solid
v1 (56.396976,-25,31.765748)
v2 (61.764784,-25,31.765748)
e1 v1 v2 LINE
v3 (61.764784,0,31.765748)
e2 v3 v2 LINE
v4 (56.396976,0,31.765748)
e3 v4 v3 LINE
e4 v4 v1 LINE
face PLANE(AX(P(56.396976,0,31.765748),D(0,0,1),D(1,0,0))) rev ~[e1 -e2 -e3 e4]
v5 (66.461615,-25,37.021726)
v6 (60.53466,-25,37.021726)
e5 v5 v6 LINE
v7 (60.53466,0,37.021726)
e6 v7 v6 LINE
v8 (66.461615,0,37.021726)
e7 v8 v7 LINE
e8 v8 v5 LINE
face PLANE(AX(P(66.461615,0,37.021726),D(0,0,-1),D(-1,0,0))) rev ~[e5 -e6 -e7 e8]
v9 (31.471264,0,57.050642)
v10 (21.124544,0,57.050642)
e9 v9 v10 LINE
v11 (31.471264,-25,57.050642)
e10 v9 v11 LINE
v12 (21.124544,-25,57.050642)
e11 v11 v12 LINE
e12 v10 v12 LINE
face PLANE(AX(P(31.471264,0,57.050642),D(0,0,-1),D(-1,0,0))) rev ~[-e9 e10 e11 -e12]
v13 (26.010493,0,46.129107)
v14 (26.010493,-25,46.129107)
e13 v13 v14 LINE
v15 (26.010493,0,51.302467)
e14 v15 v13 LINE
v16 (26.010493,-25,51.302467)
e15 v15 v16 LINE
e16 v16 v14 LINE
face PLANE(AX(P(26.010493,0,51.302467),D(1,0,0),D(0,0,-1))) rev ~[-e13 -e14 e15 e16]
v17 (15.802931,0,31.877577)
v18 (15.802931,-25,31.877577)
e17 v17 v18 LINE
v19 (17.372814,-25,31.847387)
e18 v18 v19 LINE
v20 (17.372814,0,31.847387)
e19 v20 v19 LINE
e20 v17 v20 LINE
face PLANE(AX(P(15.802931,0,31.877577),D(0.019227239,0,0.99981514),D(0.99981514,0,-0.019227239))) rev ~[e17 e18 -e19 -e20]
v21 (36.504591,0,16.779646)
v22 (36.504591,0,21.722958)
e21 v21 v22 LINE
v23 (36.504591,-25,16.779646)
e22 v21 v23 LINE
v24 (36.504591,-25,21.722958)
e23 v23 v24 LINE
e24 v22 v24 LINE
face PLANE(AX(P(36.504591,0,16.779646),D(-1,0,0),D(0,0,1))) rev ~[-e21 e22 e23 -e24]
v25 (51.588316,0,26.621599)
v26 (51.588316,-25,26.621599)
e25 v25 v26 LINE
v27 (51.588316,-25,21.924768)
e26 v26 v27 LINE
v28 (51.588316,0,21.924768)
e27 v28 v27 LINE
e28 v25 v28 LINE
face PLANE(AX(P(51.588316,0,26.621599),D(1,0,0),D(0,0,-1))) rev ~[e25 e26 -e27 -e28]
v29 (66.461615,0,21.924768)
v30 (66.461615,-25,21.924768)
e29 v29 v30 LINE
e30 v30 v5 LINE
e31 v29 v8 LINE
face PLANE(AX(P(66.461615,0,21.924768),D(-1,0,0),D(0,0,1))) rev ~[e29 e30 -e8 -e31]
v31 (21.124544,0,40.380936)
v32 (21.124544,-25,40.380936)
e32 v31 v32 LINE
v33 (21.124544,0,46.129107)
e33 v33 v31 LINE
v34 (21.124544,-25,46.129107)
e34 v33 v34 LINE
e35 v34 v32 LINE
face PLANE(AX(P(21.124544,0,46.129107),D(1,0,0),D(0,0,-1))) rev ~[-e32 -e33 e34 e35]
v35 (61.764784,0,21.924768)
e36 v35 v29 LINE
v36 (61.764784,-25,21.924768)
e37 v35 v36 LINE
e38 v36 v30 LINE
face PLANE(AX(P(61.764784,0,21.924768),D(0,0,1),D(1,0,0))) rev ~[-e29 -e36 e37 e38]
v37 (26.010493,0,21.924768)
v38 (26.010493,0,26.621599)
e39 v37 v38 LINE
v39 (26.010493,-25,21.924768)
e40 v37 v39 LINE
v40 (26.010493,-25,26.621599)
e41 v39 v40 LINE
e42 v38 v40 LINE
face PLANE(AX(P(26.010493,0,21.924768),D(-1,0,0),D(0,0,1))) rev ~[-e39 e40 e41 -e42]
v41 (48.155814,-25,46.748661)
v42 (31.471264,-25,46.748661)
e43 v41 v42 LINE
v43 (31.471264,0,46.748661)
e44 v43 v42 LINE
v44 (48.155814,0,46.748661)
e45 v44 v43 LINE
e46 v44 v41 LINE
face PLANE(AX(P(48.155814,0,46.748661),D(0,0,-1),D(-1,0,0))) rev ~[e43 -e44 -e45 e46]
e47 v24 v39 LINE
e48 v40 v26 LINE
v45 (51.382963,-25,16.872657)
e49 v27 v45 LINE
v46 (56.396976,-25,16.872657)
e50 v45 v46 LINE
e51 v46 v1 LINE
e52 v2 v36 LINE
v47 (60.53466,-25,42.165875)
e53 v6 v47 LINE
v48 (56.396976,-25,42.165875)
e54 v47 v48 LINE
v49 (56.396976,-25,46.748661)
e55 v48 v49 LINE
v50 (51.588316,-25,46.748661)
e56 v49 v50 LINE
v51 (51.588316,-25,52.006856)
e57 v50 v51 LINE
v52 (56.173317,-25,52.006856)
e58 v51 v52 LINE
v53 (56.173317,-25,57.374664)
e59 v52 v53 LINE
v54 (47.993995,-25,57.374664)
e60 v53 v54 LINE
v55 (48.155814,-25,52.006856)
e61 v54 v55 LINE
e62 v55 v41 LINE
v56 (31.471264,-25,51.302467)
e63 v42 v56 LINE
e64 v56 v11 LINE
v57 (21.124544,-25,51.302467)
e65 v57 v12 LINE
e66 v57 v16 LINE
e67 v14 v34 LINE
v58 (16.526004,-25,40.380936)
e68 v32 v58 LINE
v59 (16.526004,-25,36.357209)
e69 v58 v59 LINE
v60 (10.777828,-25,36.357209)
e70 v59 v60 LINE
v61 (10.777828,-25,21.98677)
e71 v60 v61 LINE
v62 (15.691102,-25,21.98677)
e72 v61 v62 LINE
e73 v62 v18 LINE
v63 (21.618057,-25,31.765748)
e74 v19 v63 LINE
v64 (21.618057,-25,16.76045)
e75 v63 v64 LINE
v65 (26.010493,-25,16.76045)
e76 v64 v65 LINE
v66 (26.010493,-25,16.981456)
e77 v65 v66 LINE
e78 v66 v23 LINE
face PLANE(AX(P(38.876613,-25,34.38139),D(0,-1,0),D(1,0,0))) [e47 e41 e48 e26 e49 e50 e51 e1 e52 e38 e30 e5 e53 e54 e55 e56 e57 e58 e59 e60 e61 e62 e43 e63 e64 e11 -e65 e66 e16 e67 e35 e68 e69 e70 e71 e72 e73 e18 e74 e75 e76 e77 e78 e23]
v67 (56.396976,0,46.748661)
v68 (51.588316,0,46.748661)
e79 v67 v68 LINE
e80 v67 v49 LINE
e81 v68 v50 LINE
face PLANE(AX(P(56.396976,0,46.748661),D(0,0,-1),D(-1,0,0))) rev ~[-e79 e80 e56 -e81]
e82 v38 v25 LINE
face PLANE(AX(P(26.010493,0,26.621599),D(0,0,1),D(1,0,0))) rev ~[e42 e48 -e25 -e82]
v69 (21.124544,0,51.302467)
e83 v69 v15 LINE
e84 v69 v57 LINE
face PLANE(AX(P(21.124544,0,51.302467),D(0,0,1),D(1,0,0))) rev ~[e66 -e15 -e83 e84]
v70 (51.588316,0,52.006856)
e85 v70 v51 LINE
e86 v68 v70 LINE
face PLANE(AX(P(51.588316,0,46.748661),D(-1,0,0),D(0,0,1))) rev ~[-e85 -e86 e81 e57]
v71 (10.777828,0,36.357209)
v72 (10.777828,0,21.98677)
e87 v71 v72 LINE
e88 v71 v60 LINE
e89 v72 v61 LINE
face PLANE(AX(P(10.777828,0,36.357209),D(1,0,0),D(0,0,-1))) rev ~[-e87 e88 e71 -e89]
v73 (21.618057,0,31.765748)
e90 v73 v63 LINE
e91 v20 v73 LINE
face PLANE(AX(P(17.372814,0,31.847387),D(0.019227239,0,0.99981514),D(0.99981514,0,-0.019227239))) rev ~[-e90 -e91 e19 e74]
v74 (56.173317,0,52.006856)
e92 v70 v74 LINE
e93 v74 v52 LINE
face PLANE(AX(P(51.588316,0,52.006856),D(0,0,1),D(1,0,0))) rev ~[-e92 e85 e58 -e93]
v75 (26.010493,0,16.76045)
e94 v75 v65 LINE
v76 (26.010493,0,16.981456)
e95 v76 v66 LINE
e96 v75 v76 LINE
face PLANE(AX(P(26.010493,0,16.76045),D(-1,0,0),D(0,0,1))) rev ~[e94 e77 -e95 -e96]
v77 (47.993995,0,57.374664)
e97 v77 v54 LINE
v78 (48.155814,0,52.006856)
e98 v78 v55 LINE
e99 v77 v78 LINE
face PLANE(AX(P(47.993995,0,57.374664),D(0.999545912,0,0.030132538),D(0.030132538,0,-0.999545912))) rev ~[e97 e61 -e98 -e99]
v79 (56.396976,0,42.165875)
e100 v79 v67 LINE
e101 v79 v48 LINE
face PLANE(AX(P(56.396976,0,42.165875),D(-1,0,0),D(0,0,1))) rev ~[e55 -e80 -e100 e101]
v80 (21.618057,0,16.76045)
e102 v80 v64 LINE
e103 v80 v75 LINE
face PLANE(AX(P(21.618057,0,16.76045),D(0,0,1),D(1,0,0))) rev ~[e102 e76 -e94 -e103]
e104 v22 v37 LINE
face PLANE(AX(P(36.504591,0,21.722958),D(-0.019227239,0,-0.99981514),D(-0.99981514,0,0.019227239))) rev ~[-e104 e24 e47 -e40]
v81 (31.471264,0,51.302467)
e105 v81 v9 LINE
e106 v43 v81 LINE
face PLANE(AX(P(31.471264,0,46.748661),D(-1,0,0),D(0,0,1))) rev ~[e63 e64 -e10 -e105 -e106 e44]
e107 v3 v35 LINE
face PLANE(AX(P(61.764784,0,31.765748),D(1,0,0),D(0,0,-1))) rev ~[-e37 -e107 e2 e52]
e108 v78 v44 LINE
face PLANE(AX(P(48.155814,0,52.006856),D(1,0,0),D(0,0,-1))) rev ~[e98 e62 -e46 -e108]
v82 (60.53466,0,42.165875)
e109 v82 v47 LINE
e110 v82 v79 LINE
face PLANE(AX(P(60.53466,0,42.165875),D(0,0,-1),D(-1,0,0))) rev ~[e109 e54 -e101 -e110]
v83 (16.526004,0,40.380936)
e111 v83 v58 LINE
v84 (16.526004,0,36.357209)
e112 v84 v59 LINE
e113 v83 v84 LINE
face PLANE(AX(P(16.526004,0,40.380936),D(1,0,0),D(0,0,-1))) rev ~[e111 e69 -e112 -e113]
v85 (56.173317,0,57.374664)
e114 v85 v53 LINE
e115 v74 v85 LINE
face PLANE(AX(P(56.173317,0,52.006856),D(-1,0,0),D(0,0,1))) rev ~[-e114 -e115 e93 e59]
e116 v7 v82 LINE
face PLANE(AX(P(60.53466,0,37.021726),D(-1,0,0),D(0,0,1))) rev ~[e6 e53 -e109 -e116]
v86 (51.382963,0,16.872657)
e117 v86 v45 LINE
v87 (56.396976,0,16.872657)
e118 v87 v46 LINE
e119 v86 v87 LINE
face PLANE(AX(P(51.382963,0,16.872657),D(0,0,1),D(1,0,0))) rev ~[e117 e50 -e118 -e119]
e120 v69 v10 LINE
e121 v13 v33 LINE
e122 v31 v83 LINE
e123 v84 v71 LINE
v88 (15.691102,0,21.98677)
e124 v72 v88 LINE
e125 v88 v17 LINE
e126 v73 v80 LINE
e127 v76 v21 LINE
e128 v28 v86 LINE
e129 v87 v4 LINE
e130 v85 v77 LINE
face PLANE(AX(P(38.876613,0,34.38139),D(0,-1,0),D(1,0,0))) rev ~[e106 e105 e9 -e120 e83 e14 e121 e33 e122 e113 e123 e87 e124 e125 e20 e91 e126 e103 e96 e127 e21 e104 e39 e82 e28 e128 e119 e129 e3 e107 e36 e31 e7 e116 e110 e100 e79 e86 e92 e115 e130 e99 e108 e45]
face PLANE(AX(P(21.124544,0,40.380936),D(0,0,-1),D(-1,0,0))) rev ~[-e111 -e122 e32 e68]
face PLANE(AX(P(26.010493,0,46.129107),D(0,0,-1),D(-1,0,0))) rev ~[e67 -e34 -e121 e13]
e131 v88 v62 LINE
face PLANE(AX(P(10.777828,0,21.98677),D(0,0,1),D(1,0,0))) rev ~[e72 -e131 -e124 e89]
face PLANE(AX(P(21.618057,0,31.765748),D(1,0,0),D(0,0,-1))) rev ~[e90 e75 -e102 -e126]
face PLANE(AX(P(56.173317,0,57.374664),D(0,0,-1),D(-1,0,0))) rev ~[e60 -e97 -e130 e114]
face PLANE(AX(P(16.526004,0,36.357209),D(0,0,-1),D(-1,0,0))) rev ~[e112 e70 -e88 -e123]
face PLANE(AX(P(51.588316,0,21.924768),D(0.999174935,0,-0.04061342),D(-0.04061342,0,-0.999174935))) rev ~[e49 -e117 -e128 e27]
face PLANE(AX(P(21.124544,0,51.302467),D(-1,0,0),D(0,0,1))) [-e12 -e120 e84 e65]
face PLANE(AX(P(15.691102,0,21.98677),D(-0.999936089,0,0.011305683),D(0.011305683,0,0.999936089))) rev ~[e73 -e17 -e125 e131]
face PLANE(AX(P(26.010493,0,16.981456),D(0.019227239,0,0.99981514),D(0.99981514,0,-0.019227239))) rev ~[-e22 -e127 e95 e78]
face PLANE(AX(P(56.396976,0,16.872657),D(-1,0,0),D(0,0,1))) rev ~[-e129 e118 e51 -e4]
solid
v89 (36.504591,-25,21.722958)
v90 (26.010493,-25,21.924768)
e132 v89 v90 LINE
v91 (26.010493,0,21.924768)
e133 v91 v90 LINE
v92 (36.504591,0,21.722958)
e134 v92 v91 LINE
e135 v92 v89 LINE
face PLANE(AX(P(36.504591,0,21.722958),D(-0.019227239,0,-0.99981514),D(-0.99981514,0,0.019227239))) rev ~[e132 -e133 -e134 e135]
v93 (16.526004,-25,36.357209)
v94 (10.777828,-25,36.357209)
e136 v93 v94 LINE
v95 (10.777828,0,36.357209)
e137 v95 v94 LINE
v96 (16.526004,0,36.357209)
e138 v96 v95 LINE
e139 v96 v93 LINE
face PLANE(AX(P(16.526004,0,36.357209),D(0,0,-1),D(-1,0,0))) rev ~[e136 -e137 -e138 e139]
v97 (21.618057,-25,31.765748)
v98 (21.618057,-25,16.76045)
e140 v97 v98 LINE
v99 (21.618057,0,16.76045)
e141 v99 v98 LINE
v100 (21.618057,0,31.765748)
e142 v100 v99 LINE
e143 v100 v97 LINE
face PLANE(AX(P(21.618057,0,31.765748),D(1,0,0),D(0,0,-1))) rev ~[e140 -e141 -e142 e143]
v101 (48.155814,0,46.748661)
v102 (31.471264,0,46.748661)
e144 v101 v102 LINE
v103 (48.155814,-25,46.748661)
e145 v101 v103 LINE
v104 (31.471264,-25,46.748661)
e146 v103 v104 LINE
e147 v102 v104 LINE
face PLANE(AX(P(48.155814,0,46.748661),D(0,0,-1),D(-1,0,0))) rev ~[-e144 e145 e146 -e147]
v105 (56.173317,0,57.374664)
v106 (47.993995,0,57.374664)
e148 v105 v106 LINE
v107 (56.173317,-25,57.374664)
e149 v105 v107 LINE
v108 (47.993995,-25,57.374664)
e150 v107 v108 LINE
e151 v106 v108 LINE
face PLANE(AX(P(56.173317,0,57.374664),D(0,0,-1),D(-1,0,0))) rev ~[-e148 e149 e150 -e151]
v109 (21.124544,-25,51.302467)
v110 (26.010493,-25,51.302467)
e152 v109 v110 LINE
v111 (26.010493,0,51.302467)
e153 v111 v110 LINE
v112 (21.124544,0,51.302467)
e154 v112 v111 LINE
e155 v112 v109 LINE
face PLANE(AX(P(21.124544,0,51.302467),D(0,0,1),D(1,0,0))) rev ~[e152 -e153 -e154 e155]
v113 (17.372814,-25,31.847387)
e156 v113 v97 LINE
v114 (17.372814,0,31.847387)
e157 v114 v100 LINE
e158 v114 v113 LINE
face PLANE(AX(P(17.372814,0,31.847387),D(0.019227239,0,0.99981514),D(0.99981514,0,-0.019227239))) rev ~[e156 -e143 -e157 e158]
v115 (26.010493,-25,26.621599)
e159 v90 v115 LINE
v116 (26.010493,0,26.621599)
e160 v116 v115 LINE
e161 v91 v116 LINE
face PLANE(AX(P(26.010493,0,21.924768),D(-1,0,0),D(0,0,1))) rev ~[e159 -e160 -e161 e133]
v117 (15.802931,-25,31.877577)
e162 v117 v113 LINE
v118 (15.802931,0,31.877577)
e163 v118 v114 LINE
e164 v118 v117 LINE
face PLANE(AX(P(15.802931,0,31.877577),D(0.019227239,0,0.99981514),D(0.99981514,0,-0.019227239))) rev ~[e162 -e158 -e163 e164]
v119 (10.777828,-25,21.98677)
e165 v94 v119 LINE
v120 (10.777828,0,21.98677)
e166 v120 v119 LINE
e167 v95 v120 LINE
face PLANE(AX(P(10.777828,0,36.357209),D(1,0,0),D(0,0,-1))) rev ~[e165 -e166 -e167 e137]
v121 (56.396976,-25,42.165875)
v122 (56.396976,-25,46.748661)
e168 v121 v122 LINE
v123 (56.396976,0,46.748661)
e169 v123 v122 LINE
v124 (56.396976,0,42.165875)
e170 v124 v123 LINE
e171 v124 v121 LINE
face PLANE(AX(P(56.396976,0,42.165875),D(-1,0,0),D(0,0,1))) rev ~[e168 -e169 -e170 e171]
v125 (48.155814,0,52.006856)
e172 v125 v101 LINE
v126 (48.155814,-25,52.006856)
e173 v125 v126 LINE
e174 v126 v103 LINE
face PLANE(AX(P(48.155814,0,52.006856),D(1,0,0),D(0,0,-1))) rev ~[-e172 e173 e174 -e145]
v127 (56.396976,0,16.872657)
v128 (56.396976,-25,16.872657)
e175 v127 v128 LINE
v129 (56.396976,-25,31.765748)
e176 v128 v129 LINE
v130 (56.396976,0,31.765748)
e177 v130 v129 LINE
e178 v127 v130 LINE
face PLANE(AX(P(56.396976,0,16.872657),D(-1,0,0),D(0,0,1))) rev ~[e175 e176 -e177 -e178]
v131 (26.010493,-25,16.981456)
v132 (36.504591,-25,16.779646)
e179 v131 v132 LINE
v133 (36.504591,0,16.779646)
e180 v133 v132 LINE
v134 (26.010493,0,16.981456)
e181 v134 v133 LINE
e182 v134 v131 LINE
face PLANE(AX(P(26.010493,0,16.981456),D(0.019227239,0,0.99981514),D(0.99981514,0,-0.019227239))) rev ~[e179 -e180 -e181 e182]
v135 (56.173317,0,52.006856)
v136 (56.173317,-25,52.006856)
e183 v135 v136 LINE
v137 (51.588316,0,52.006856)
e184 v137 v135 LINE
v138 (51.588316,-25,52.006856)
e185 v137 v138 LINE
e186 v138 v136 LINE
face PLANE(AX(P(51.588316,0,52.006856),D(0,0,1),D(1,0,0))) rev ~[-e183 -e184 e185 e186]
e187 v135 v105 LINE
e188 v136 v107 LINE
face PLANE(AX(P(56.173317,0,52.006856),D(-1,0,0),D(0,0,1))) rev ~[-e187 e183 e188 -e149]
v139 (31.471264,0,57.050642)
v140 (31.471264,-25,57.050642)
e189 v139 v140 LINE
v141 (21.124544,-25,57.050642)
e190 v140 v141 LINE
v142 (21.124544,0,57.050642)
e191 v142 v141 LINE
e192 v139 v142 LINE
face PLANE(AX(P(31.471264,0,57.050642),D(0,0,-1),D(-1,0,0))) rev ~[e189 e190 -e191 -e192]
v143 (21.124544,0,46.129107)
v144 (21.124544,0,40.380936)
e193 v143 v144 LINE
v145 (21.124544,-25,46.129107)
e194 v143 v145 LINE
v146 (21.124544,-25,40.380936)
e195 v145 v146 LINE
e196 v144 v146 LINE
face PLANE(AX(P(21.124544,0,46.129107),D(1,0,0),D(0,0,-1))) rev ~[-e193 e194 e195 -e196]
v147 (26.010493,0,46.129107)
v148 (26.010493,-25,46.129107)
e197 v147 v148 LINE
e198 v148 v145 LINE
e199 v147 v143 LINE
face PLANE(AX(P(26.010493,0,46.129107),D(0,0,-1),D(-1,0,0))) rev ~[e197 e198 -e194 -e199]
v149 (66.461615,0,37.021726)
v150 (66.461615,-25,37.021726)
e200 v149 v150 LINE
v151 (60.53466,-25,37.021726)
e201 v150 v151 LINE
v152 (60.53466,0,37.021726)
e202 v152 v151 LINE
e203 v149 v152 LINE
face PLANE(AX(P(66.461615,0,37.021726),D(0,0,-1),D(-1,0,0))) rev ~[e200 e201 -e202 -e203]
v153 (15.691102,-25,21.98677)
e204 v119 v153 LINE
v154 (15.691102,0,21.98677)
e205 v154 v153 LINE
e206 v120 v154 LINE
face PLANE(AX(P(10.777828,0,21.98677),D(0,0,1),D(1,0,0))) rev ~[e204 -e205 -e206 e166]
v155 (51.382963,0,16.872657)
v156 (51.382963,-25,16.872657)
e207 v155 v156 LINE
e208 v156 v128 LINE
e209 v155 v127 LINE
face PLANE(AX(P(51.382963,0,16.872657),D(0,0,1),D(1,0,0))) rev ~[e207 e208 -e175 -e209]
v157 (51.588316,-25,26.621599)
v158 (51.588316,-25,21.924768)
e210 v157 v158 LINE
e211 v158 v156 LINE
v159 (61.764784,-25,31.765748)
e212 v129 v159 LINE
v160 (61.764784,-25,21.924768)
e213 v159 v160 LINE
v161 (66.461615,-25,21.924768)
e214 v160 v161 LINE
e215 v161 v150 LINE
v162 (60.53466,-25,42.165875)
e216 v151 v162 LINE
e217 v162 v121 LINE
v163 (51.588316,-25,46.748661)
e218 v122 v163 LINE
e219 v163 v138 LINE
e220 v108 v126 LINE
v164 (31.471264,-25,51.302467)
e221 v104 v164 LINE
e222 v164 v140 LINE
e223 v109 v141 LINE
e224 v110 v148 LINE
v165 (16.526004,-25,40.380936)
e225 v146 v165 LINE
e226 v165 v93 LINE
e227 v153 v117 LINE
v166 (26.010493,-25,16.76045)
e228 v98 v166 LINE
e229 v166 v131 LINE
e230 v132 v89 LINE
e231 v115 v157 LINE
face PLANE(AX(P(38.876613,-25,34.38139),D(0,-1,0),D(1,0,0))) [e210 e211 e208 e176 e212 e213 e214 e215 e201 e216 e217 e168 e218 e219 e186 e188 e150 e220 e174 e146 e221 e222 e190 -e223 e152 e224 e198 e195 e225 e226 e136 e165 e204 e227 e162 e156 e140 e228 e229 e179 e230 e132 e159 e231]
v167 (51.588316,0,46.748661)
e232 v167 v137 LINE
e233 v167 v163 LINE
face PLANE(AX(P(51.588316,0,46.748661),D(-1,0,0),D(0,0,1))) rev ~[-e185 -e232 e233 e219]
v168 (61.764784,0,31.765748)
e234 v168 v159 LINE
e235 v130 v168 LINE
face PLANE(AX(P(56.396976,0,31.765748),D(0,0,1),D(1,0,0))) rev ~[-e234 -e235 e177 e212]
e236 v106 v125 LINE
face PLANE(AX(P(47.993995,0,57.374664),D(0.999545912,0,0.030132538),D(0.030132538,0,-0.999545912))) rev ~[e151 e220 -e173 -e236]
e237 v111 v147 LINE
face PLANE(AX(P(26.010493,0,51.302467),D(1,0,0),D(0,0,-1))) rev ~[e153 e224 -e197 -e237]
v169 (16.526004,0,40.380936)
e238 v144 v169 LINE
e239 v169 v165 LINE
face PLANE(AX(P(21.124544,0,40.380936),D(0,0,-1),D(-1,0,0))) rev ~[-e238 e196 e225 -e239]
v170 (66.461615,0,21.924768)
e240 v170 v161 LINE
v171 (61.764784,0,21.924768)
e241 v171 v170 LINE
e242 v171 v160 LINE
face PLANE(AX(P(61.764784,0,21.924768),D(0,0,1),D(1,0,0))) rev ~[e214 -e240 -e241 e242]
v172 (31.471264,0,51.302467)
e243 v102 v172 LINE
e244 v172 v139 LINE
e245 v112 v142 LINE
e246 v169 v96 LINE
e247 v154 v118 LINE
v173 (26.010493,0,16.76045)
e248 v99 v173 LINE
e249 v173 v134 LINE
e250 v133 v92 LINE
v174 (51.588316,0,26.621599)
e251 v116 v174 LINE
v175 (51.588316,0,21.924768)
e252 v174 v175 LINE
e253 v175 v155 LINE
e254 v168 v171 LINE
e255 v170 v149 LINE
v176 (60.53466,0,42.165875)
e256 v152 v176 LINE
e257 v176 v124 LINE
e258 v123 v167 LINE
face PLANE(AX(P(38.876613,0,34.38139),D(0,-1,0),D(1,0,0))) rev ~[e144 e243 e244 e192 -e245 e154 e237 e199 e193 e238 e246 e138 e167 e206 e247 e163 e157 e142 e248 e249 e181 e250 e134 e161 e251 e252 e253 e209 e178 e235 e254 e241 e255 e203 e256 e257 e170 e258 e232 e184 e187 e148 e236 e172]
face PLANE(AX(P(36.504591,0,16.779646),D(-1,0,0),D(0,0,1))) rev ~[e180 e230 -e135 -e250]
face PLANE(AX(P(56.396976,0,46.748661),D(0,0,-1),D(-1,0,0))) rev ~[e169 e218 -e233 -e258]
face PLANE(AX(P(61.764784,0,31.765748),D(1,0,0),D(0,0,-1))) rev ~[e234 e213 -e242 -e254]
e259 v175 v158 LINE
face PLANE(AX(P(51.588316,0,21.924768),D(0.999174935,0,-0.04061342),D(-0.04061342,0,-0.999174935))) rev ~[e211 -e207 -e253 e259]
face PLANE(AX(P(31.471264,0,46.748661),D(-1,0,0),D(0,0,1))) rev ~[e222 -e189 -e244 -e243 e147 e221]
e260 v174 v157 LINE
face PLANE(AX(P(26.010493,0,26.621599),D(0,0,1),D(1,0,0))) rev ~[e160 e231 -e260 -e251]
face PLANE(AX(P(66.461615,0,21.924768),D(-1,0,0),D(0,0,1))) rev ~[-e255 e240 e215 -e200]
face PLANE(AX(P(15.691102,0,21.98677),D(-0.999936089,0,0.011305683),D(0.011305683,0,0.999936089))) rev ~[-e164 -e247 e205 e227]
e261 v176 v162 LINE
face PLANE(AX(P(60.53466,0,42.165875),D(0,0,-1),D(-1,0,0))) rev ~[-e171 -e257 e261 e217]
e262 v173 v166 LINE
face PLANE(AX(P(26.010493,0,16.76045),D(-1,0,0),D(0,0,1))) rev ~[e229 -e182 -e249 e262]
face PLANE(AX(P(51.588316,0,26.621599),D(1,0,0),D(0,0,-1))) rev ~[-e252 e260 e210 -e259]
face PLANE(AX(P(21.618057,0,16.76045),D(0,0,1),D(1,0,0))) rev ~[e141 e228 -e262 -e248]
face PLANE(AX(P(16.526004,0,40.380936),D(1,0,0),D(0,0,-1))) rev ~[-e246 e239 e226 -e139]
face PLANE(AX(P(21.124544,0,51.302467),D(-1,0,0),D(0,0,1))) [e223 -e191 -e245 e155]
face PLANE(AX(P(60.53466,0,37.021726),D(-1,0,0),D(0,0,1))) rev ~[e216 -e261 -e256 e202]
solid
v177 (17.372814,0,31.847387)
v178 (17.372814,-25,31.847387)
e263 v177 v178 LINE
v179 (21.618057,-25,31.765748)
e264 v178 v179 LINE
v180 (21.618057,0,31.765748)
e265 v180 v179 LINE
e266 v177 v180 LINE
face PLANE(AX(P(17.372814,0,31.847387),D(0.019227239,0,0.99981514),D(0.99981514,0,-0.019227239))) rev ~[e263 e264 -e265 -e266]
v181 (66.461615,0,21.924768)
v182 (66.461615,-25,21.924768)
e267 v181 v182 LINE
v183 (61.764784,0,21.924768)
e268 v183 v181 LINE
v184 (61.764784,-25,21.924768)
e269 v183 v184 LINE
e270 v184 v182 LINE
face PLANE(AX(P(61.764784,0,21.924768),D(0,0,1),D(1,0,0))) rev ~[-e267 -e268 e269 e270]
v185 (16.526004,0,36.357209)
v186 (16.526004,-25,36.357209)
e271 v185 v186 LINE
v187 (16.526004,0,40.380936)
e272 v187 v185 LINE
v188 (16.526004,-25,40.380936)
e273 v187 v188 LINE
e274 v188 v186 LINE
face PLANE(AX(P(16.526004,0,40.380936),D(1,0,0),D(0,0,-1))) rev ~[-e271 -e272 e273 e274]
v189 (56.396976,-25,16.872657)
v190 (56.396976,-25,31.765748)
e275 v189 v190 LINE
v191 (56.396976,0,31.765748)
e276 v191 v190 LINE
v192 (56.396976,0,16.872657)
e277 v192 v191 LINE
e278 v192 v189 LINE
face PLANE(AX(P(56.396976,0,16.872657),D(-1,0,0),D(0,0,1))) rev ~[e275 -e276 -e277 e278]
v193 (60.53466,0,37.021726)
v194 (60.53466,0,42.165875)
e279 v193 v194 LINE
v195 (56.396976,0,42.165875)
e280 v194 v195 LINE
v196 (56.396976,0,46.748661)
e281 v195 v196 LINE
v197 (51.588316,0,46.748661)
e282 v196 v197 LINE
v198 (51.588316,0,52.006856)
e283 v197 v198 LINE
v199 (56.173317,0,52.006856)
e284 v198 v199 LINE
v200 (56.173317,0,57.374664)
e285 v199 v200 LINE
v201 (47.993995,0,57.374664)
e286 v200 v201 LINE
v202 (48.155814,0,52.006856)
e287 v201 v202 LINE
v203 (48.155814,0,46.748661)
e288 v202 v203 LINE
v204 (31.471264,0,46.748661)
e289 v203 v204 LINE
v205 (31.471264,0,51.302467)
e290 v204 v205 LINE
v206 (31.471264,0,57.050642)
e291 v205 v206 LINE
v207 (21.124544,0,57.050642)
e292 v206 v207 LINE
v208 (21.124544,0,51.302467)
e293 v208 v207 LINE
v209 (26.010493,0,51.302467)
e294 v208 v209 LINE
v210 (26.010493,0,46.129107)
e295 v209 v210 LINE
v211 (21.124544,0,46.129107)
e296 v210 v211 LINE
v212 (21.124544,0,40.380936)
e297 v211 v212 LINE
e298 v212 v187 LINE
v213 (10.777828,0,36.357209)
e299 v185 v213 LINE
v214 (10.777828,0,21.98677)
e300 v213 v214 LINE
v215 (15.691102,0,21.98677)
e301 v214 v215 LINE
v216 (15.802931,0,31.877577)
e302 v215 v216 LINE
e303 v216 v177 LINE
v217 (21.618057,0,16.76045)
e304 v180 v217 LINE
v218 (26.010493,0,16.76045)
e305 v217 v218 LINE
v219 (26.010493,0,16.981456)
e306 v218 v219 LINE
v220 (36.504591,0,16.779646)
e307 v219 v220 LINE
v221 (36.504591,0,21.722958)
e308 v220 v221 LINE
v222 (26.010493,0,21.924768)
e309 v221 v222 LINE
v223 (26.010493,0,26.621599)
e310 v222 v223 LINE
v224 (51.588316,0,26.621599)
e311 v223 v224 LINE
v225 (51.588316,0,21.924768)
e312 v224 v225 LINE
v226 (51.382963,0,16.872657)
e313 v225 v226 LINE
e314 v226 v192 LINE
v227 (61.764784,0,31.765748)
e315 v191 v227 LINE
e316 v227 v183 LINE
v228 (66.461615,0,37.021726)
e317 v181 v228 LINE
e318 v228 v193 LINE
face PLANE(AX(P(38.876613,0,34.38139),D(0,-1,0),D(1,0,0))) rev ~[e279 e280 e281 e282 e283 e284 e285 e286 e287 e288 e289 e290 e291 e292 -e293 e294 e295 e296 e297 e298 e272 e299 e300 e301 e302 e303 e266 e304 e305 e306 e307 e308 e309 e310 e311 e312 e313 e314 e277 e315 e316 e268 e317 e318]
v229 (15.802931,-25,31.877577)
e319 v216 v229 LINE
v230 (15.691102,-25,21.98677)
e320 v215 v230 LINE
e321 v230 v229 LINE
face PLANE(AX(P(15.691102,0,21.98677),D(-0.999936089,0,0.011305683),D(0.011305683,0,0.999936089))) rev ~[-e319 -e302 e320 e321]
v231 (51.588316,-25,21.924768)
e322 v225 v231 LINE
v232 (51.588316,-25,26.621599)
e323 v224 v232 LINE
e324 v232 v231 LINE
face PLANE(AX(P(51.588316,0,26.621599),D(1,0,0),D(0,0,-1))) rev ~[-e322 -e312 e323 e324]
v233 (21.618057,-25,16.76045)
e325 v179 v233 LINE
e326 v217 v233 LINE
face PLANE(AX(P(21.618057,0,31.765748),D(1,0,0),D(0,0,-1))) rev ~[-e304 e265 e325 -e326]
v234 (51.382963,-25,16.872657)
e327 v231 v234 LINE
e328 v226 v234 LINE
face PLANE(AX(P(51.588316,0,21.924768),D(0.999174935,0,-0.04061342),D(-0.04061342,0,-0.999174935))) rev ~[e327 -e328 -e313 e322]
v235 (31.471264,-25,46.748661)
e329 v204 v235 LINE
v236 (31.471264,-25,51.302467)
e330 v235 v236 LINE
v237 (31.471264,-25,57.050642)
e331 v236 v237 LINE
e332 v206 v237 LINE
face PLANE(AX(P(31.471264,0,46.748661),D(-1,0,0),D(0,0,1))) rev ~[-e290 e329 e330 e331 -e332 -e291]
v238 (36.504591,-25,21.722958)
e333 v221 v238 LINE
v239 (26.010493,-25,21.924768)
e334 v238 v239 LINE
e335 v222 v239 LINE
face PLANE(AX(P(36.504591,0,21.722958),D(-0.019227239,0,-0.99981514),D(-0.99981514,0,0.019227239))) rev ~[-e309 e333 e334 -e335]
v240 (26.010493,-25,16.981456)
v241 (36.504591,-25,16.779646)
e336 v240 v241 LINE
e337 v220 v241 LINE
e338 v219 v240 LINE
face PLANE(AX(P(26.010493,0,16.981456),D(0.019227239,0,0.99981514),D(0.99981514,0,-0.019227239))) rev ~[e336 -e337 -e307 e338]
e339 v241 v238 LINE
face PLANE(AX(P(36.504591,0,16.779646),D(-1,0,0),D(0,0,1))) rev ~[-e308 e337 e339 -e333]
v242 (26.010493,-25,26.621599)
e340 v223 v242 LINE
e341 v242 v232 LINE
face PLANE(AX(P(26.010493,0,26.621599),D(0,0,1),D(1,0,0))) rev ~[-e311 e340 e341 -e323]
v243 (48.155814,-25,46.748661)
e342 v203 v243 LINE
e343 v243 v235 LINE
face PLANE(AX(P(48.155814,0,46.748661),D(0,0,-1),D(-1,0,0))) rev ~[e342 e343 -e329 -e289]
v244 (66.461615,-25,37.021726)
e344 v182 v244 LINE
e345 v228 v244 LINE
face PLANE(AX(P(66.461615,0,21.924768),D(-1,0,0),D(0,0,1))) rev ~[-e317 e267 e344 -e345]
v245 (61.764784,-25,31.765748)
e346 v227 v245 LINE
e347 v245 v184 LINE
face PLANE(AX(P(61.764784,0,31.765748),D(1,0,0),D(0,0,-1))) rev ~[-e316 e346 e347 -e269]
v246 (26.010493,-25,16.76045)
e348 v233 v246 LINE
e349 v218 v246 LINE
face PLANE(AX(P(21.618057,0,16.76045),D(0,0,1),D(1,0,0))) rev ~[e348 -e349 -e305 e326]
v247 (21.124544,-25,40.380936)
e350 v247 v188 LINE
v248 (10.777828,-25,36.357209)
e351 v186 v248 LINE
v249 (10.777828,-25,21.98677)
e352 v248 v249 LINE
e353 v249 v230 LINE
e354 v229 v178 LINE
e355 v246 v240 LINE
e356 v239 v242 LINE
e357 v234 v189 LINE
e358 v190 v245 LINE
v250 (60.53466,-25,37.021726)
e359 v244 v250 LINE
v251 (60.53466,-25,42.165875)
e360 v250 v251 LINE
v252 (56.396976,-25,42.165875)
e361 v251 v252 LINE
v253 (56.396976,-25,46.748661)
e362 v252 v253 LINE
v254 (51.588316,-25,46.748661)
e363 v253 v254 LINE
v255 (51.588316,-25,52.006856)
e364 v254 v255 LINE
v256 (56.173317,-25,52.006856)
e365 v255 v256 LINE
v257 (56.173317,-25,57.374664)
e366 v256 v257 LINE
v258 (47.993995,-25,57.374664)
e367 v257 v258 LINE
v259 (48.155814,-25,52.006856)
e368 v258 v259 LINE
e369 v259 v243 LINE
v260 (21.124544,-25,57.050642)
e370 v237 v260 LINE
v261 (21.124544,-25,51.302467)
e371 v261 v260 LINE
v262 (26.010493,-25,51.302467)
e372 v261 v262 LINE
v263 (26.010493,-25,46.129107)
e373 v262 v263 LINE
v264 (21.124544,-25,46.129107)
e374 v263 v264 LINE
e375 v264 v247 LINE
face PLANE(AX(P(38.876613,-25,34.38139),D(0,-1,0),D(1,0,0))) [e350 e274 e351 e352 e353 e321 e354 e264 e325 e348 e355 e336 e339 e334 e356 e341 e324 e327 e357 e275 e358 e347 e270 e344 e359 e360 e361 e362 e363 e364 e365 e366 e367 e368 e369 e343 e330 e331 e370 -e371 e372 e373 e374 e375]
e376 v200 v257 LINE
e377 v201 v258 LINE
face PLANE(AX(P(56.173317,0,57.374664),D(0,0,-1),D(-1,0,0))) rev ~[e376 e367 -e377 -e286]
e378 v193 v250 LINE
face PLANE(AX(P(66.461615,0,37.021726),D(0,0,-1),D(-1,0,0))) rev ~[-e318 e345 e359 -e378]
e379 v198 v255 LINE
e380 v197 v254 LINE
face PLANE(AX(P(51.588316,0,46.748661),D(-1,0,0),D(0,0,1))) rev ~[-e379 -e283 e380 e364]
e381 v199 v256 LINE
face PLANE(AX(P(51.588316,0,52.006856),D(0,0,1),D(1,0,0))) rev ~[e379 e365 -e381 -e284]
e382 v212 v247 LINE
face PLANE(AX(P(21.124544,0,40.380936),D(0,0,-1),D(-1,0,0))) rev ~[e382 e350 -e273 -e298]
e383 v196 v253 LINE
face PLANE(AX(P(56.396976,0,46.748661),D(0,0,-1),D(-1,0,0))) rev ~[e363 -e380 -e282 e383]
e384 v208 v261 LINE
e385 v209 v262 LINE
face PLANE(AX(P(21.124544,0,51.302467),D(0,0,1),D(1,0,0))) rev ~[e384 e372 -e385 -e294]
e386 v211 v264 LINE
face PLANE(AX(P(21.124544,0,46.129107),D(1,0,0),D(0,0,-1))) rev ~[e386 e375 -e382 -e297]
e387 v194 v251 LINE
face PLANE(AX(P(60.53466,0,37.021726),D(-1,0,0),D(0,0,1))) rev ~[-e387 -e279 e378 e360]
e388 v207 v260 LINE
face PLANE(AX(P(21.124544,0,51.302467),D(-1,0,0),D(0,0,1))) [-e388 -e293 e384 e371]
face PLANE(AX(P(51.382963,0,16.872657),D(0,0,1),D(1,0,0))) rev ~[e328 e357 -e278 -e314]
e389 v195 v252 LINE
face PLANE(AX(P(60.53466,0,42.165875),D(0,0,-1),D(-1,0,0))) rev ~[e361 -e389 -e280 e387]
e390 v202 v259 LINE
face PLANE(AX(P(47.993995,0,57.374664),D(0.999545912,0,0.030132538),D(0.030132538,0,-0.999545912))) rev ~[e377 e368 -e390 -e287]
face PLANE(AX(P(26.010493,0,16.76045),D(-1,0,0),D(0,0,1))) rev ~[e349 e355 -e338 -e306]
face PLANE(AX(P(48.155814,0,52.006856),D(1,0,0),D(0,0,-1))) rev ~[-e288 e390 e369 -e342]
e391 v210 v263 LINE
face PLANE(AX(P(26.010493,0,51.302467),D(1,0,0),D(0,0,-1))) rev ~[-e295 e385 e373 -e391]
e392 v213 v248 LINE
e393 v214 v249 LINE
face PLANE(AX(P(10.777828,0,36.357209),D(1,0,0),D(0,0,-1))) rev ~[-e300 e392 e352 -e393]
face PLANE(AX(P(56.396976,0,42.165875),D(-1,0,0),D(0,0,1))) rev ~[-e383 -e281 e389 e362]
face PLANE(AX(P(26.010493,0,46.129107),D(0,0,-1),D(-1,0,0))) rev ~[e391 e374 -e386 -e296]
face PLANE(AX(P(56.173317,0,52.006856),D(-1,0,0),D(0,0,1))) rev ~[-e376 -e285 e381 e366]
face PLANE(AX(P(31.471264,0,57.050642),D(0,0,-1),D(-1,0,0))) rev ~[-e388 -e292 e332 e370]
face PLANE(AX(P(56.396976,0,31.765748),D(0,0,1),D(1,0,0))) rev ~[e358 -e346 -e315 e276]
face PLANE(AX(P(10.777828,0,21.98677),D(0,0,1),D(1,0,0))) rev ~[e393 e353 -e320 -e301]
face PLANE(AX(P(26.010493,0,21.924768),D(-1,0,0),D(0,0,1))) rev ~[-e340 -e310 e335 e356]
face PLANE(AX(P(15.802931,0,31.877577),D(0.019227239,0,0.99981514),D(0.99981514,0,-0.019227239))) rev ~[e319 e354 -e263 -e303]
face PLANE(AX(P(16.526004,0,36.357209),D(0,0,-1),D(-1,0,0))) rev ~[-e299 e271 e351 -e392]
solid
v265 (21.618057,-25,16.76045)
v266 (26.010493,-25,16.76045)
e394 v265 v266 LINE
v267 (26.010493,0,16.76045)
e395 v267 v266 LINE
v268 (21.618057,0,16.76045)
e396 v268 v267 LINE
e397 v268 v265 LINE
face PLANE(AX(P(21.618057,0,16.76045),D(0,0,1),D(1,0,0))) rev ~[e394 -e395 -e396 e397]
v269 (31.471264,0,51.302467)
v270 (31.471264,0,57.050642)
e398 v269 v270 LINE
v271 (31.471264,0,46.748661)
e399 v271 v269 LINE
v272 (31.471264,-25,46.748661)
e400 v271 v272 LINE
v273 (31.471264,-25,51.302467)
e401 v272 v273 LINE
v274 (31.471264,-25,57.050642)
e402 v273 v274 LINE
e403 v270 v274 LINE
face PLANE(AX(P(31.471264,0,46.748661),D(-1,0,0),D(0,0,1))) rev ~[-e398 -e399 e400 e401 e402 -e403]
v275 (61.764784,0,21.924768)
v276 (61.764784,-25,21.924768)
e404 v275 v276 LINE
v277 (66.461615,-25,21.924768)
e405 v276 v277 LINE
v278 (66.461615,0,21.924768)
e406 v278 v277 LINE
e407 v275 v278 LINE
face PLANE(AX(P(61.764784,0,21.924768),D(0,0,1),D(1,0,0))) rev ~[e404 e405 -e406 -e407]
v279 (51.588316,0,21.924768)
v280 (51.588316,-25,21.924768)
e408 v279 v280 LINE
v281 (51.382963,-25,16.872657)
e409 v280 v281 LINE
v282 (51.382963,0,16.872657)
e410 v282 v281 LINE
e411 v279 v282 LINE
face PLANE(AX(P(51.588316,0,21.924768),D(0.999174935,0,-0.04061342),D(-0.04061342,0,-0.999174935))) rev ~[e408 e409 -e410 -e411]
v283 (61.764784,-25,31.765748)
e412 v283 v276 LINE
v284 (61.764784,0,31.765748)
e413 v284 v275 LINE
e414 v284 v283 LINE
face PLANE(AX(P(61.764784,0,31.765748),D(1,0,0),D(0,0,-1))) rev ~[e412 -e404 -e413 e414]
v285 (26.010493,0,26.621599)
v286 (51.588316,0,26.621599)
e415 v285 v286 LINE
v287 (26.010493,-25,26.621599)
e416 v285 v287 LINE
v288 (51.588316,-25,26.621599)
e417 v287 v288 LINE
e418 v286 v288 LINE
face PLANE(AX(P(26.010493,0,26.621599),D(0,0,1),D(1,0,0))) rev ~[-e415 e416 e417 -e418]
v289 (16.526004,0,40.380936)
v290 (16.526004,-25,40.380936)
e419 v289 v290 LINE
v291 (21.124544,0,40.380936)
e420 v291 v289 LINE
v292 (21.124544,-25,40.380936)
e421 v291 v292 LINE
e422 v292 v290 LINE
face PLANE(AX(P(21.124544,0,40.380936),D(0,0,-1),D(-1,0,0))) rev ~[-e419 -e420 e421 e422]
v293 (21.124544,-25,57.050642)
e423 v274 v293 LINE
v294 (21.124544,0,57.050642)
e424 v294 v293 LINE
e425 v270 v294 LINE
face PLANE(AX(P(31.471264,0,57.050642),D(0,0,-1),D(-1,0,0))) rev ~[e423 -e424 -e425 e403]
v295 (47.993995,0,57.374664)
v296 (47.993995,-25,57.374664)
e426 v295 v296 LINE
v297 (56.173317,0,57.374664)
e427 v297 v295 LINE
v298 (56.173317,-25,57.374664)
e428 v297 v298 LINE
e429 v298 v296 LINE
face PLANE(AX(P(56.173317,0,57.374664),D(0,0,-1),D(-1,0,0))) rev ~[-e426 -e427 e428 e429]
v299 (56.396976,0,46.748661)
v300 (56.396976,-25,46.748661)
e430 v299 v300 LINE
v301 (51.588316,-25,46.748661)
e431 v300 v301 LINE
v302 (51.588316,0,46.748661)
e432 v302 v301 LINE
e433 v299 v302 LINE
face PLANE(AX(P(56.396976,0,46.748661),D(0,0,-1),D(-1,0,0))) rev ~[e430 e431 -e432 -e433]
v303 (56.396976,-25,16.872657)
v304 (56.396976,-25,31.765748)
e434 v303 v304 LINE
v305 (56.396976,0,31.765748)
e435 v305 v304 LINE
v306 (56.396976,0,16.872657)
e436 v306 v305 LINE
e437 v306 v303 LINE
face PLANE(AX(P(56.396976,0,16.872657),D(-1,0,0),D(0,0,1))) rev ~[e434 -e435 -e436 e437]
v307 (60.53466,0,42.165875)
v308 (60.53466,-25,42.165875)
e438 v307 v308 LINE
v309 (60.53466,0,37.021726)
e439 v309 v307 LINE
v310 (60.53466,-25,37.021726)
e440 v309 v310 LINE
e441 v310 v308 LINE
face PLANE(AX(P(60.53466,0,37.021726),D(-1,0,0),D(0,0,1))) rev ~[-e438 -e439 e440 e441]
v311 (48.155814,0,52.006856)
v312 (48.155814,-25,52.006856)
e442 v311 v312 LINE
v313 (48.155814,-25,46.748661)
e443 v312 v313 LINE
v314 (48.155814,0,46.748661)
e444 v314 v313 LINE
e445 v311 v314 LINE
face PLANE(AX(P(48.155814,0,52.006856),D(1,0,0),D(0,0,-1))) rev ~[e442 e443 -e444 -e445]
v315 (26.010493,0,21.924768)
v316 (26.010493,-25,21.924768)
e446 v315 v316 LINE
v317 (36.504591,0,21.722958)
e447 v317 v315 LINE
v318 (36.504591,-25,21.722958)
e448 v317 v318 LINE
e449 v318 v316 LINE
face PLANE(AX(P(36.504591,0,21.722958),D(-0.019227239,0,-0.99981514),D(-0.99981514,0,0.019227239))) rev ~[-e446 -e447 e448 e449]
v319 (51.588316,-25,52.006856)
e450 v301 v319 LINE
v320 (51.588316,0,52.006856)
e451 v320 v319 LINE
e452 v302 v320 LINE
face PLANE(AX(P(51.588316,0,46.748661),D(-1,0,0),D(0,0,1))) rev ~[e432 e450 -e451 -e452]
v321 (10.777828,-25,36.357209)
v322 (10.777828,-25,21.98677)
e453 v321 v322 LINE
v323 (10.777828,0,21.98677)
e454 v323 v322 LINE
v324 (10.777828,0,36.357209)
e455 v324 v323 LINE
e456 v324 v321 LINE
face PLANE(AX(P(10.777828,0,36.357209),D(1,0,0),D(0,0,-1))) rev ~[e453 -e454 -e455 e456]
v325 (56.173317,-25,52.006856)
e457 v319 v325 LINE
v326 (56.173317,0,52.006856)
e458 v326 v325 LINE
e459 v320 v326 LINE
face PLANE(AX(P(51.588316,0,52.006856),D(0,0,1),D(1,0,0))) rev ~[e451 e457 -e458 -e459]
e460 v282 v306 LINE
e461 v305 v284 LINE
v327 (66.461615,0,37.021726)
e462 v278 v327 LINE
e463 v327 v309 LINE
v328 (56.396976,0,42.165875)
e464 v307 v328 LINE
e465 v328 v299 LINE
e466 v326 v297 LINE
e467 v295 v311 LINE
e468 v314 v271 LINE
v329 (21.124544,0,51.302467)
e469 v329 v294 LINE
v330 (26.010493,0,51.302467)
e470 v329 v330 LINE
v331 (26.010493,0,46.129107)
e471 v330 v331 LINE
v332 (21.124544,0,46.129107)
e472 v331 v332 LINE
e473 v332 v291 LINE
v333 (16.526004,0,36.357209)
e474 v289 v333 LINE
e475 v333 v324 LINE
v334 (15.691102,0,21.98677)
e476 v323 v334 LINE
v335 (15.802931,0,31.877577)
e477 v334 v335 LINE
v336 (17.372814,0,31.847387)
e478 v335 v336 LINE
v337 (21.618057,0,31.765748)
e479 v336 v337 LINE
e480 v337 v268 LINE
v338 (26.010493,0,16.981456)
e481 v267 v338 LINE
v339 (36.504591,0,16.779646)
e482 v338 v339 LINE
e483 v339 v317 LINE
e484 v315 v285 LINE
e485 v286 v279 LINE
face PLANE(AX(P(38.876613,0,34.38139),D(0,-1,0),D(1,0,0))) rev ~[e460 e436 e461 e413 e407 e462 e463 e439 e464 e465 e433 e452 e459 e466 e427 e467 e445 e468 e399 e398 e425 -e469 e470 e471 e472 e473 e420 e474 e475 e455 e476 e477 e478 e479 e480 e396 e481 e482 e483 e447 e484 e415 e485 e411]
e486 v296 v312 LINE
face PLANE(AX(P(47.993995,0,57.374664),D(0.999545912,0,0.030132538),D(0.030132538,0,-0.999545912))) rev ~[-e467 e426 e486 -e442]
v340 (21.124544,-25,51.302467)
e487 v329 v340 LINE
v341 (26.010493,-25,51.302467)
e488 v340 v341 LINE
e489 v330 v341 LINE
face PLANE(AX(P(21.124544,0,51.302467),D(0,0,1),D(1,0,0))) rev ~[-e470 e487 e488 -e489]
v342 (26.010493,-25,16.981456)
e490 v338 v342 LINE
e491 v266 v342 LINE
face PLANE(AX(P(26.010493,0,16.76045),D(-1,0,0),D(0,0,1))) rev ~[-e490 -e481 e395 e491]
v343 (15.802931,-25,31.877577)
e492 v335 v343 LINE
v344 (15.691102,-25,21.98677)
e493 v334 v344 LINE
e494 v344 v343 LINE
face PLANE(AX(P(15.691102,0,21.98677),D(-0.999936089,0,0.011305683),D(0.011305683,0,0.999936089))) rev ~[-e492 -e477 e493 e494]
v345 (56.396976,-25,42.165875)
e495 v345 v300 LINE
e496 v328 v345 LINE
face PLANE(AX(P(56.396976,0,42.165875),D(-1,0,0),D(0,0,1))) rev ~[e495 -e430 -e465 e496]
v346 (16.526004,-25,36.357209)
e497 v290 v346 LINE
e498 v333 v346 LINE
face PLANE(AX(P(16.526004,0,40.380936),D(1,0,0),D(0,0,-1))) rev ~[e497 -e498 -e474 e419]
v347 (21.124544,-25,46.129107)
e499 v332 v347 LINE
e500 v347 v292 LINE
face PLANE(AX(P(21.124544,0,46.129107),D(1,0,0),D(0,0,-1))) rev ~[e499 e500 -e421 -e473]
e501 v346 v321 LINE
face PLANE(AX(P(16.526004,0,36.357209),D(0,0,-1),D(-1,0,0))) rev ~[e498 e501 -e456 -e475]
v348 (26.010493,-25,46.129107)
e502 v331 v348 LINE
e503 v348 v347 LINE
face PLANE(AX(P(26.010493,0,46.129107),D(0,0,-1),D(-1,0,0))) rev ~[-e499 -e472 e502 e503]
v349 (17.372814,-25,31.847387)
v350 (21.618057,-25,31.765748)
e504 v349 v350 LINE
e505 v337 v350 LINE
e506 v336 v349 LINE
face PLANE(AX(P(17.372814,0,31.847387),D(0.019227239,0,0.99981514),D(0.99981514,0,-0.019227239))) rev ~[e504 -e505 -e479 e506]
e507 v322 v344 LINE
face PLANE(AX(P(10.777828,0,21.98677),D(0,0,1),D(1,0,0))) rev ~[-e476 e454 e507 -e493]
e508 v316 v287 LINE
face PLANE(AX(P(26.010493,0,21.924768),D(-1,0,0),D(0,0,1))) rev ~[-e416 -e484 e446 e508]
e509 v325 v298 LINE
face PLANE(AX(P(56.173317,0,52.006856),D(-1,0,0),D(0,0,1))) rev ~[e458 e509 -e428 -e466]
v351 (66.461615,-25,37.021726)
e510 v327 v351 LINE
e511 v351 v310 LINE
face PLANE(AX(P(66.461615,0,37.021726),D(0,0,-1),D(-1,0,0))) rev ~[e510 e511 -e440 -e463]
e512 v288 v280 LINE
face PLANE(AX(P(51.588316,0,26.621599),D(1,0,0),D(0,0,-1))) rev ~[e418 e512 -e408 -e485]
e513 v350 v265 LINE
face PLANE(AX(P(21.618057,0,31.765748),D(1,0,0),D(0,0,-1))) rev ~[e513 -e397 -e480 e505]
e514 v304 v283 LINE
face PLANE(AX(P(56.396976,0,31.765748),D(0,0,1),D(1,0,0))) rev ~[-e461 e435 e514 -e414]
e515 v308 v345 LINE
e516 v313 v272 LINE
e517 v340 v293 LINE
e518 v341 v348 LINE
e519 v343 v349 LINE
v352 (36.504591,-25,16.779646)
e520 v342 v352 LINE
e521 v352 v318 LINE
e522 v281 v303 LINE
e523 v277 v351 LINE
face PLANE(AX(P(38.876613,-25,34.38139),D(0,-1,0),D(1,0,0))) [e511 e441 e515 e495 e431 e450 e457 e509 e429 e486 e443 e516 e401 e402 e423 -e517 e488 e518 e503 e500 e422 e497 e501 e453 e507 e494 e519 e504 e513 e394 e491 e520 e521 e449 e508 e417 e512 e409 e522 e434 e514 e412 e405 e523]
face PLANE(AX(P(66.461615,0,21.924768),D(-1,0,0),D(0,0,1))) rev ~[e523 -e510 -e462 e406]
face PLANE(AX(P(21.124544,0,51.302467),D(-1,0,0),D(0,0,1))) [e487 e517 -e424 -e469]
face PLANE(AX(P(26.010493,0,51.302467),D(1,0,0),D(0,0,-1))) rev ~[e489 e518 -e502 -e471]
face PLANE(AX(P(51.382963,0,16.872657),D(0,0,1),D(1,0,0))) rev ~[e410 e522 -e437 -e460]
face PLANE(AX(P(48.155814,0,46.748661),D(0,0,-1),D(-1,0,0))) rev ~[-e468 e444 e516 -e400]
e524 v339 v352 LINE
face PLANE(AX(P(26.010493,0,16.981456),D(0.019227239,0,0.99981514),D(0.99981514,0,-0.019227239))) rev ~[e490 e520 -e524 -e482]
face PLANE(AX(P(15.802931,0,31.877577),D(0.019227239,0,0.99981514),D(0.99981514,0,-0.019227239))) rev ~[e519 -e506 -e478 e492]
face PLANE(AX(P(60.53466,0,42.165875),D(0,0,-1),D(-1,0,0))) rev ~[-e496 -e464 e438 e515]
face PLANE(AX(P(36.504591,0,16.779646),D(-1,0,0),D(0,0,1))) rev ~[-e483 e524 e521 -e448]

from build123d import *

# Parameters (mm, degrees)
F0_W     = 4.8859491944
F0_H     = 5.7481750846
F0_W_2   = 5.4607708007
F0_W_3   = 4.5850016177
F0_H_2   = 5.367808044
F2_DEPTH = 25
F3_DEPTH = 25
F4_DEPTH = 25
F5_DEPTH = 25


with BuildPart() as f2:
    # F0 (on Front) → F2 (new body)
    with BuildSketch(Plane.XZ):
        Polygon((10.7778282836, 36.3572090864), (10.7778282836, 21.9867695123), (15.6911015511, 21.9867695123), (15.8029310405, 31.8775773048), (17.372814146, 31.8473872064), (21.6180570424, 31.7657478154), (21.6180570424, 21.9247676432), (26.0104928166, 21.9247676432), (26.0104928166, 26.6215987504), (51.5883155167, 26.6215987504), (51.5883155167, 21.9247676432), (56.3969761133, 21.9247676432), (56.3969761133, 31.7657478154), (61.7647841573, 31.7657478154), (61.7647841573, 21.9247676432), (66.4616152644, 21.9247676432), (66.4616152644, 37.0217263699), (61.0938072205, 37.0217263699), (60.5346597731, 37.0217263699), (60.5346597731, 42.1658754349), (56.3969761133, 42.1658754349), (56.3969761133, 46.7486605048), (51.5883155167, 46.7486605048), (51.5883155167, 51.7831966281), (51.5883155167, 52.006855607), (48.1558144093, 52.006855607), (48.1558144093, 46.7486605048), (31.7722000182, 46.7486605048), (31.4712636173, 46.7486605048), (31.4712636173, 51.3024665415), (26.0104928166, 51.3024665415), (26.0104928166, 46.1291074753), (21.1245436221, 46.1291074753), (21.1245436221, 40.380936116), (16.5260042995, 40.380936116), (16.5260042995, 36.3572090864), (11.9274631143, 36.3572090864), align=None)
        Polygon((26.0104928166, 21.9247676432), (21.6180570424, 21.9247676432), (21.6180570424, 21.3656201959), (21.6180570424, 16.7604498565), (26.0104928166, 16.7604498565), (26.0104928166, 16.9814561175), align=None)
        Polygon((36.504591053, 21.7229578032), (26.0104928166, 21.9247676432), (26.0104928166, 16.9814561175), (36.504591053, 16.7796462774), align=None)
        with Locations((23.5675182194, 54.1765540838)):
            Rectangle(F0_W, F0_H)
        with Locations((28.7408782169, 54.1765540838)):
            Rectangle(F0_W_2, F0_H)
        Polygon((56.3969761133, 21.9247676432), (51.5883155167, 21.9247676432), (51.3829626143, 16.872657463), (56.2078505754, 16.872657463), (56.3969761133, 16.872657463), (56.3969761133, 17.3397641629), align=None)
        Polygon((47.9939952493, 57.374663651), (48.1558144093, 52.006855607), (51.5883155167, 52.006855607), (51.5883155167, 57.374663651), align=None)
        with Locations((53.8808163255, 54.690759629)):
            Rectangle(F0_W_3, F0_H_2)
    extrude(amount=F2_DEPTH)


with BuildPart() as f3:
    # F0 (on Front) → F3 (new body)
    with BuildSketch(Plane.XZ):
        Polygon((10.7778282836, 36.3572090864), (10.7778282836, 21.9867695123), (15.6911015511, 21.9867695123), (15.8029310405, 31.8775773048), (17.372814146, 31.8473872064), (21.6180570424, 31.7657478154), (21.6180570424, 21.9247676432), (26.0104928166, 21.9247676432), (26.0104928166, 26.6215987504), (51.5883155167, 26.6215987504), (51.5883155167, 21.9247676432), (56.3969761133, 21.9247676432), (56.3969761133, 31.7657478154), (61.7647841573, 31.7657478154), (61.7647841573, 21.9247676432), (66.4616152644, 21.9247676432), (66.4616152644, 37.0217263699), (61.0938072205, 37.0217263699), (60.5346597731, 37.0217263699), (60.5346597731, 42.1658754349), (56.3969761133, 42.1658754349), (56.3969761133, 46.7486605048), (51.5883155167, 46.7486605048), (51.5883155167, 51.7831966281), (51.5883155167, 52.006855607), (48.1558144093, 52.006855607), (48.1558144093, 46.7486605048), (31.7722000182, 46.7486605048), (31.4712636173, 46.7486605048), (31.4712636173, 51.3024665415), (26.0104928166, 51.3024665415), (26.0104928166, 46.1291074753), (21.1245436221, 46.1291074753), (21.1245436221, 40.380936116), (16.5260042995, 40.380936116), (16.5260042995, 36.3572090864), (11.9274631143, 36.3572090864), align=None)
        Polygon((26.0104928166, 21.9247676432), (21.6180570424, 21.9247676432), (21.6180570424, 21.3656201959), (21.6180570424, 16.7604498565), (26.0104928166, 16.7604498565), (26.0104928166, 16.9814561175), align=None)
        Polygon((36.504591053, 21.7229578032), (26.0104928166, 21.9247676432), (26.0104928166, 16.9814561175), (36.504591053, 16.7796462774), align=None)
        with Locations((23.5675182194, 54.1765540838)):
            Rectangle(F0_W, F0_H)
        with Locations((28.7408782169, 54.1765540838)):
            Rectangle(F0_W_2, F0_H)
        Polygon((56.3969761133, 21.9247676432), (51.5883155167, 21.9247676432), (51.3829626143, 16.872657463), (56.2078505754, 16.872657463), (56.3969761133, 16.872657463), (56.3969761133, 17.3397641629), align=None)
        Polygon((47.9939952493, 57.374663651), (48.1558144093, 52.006855607), (51.5883155167, 52.006855607), (51.5883155167, 57.374663651), align=None)
        with Locations((53.8808163255, 54.690759629)):
            Rectangle(F0_W_3, F0_H_2)
    extrude(amount=F3_DEPTH)


with BuildPart() as f4:
    # F0 (on Front) → F4 (new body)
    with BuildSketch(Plane.XZ):
        Polygon((10.7778282836, 36.3572090864), (10.7778282836, 21.9867695123), (15.6911015511, 21.9867695123), (15.8029310405, 31.8775773048), (17.372814146, 31.8473872064), (21.6180570424, 31.7657478154), (21.6180570424, 21.9247676432), (26.0104928166, 21.9247676432), (26.0104928166, 26.6215987504), (51.5883155167, 26.6215987504), (51.5883155167, 21.9247676432), (56.3969761133, 21.9247676432), (56.3969761133, 31.7657478154), (61.7647841573, 31.7657478154), (61.7647841573, 21.9247676432), (66.4616152644, 21.9247676432), (66.4616152644, 37.0217263699), (61.0938072205, 37.0217263699), (60.5346597731, 37.0217263699), (60.5346597731, 42.1658754349), (56.3969761133, 42.1658754349), (56.3969761133, 46.7486605048), (51.5883155167, 46.7486605048), (51.5883155167, 51.7831966281), (51.5883155167, 52.006855607), (48.1558144093, 52.006855607), (48.1558144093, 46.7486605048), (31.7722000182, 46.7486605048), (31.4712636173, 46.7486605048), (31.4712636173, 51.3024665415), (26.0104928166, 51.3024665415), (26.0104928166, 46.1291074753), (21.1245436221, 46.1291074753), (21.1245436221, 40.380936116), (16.5260042995, 40.380936116), (16.5260042995, 36.3572090864), (11.9274631143, 36.3572090864), align=None)
        Polygon((26.0104928166, 21.9247676432), (21.6180570424, 21.9247676432), (21.6180570424, 21.3656201959), (21.6180570424, 16.7604498565), (26.0104928166, 16.7604498565), (26.0104928166, 16.9814561175), align=None)
        Polygon((36.504591053, 21.7229578032), (26.0104928166, 21.9247676432), (26.0104928166, 16.9814561175), (36.504591053, 16.7796462774), align=None)
        with Locations((23.5675182194, 54.1765540838)):
            Rectangle(F0_W, F0_H)
        with Locations((28.7408782169, 54.1765540838)):
            Rectangle(F0_W_2, F0_H)
        Polygon((56.3969761133, 21.9247676432), (51.5883155167, 21.9247676432), (51.3829626143, 16.872657463), (56.2078505754, 16.872657463), (56.3969761133, 16.872657463), (56.3969761133, 17.3397641629), align=None)
        Polygon((47.9939952493, 57.374663651), (48.1558144093, 52.006855607), (51.5883155167, 52.006855607), (51.5883155167, 57.374663651), align=None)
        with Locations((53.8808163255, 54.690759629)):
            Rectangle(F0_W_3, F0_H_2)
    extrude(amount=F4_DEPTH)


with BuildPart() as f5:
    # F0 (on Front) → F5 (new body)
    with BuildSketch(Plane.XZ):
        Polygon((10.7778282836, 36.3572090864), (10.7778282836, 21.9867695123), (15.6911015511, 21.9867695123), (15.8029310405, 31.8775773048), (17.372814146, 31.8473872064), (21.6180570424, 31.7657478154), (21.6180570424, 21.9247676432), (26.0104928166, 21.9247676432), (26.0104928166, 26.6215987504), (51.5883155167, 26.6215987504), (51.5883155167, 21.9247676432), (56.3969761133, 21.9247676432), (56.3969761133, 31.7657478154), (61.7647841573, 31.7657478154), (61.7647841573, 21.9247676432), (66.4616152644, 21.9247676432), (66.4616152644, 37.0217263699), (61.0938072205, 37.0217263699), (60.5346597731, 37.0217263699), (60.5346597731, 42.1658754349), (56.3969761133, 42.1658754349), (56.3969761133, 46.7486605048), (51.5883155167, 46.7486605048), (51.5883155167, 51.7831966281), (51.5883155167, 52.006855607), (48.1558144093, 52.006855607), (48.1558144093, 46.7486605048), (31.7722000182, 46.7486605048), (31.4712636173, 46.7486605048), (31.4712636173, 51.3024665415), (26.0104928166, 51.3024665415), (26.0104928166, 46.1291074753), (21.1245436221, 46.1291074753), (21.1245436221, 40.380936116), (16.5260042995, 40.380936116), (16.5260042995, 36.3572090864), (11.9274631143, 36.3572090864), align=None)
        Polygon((26.0104928166, 21.9247676432), (21.6180570424, 21.9247676432), (21.6180570424, 21.3656201959), (21.6180570424, 16.7604498565), (26.0104928166, 16.7604498565), (26.0104928166, 16.9814561175), align=None)
        Polygon((36.504591053, 21.7229578032), (26.0104928166, 21.9247676432), (26.0104928166, 16.9814561175), (36.504591053, 16.7796462774), align=None)
        with Locations((23.5675182194, 54.1765540838)):
            Rectangle(F0_W, F0_H)
        with Locations((28.7408782169, 54.1765540838)):
            Rectangle(F0_W_2, F0_H)
        Polygon((56.3969761133, 21.9247676432), (51.5883155167, 21.9247676432), (51.3829626143, 16.872657463), (56.2078505754, 16.872657463), (56.3969761133, 16.872657463), (56.3969761133, 17.3397641629), align=None)
        Polygon((47.9939952493, 57.374663651), (48.1558144093, 52.006855607), (51.5883155167, 52.006855607), (51.5883155167, 57.374663651), align=None)
        with Locations((53.8808163255, 54.690759629)):
            Rectangle(F0_W_3, F0_H_2)
    extrude(amount=F5_DEPTH)


solid = Compound([f2.part, f3.part, f4.part, f5.part])
